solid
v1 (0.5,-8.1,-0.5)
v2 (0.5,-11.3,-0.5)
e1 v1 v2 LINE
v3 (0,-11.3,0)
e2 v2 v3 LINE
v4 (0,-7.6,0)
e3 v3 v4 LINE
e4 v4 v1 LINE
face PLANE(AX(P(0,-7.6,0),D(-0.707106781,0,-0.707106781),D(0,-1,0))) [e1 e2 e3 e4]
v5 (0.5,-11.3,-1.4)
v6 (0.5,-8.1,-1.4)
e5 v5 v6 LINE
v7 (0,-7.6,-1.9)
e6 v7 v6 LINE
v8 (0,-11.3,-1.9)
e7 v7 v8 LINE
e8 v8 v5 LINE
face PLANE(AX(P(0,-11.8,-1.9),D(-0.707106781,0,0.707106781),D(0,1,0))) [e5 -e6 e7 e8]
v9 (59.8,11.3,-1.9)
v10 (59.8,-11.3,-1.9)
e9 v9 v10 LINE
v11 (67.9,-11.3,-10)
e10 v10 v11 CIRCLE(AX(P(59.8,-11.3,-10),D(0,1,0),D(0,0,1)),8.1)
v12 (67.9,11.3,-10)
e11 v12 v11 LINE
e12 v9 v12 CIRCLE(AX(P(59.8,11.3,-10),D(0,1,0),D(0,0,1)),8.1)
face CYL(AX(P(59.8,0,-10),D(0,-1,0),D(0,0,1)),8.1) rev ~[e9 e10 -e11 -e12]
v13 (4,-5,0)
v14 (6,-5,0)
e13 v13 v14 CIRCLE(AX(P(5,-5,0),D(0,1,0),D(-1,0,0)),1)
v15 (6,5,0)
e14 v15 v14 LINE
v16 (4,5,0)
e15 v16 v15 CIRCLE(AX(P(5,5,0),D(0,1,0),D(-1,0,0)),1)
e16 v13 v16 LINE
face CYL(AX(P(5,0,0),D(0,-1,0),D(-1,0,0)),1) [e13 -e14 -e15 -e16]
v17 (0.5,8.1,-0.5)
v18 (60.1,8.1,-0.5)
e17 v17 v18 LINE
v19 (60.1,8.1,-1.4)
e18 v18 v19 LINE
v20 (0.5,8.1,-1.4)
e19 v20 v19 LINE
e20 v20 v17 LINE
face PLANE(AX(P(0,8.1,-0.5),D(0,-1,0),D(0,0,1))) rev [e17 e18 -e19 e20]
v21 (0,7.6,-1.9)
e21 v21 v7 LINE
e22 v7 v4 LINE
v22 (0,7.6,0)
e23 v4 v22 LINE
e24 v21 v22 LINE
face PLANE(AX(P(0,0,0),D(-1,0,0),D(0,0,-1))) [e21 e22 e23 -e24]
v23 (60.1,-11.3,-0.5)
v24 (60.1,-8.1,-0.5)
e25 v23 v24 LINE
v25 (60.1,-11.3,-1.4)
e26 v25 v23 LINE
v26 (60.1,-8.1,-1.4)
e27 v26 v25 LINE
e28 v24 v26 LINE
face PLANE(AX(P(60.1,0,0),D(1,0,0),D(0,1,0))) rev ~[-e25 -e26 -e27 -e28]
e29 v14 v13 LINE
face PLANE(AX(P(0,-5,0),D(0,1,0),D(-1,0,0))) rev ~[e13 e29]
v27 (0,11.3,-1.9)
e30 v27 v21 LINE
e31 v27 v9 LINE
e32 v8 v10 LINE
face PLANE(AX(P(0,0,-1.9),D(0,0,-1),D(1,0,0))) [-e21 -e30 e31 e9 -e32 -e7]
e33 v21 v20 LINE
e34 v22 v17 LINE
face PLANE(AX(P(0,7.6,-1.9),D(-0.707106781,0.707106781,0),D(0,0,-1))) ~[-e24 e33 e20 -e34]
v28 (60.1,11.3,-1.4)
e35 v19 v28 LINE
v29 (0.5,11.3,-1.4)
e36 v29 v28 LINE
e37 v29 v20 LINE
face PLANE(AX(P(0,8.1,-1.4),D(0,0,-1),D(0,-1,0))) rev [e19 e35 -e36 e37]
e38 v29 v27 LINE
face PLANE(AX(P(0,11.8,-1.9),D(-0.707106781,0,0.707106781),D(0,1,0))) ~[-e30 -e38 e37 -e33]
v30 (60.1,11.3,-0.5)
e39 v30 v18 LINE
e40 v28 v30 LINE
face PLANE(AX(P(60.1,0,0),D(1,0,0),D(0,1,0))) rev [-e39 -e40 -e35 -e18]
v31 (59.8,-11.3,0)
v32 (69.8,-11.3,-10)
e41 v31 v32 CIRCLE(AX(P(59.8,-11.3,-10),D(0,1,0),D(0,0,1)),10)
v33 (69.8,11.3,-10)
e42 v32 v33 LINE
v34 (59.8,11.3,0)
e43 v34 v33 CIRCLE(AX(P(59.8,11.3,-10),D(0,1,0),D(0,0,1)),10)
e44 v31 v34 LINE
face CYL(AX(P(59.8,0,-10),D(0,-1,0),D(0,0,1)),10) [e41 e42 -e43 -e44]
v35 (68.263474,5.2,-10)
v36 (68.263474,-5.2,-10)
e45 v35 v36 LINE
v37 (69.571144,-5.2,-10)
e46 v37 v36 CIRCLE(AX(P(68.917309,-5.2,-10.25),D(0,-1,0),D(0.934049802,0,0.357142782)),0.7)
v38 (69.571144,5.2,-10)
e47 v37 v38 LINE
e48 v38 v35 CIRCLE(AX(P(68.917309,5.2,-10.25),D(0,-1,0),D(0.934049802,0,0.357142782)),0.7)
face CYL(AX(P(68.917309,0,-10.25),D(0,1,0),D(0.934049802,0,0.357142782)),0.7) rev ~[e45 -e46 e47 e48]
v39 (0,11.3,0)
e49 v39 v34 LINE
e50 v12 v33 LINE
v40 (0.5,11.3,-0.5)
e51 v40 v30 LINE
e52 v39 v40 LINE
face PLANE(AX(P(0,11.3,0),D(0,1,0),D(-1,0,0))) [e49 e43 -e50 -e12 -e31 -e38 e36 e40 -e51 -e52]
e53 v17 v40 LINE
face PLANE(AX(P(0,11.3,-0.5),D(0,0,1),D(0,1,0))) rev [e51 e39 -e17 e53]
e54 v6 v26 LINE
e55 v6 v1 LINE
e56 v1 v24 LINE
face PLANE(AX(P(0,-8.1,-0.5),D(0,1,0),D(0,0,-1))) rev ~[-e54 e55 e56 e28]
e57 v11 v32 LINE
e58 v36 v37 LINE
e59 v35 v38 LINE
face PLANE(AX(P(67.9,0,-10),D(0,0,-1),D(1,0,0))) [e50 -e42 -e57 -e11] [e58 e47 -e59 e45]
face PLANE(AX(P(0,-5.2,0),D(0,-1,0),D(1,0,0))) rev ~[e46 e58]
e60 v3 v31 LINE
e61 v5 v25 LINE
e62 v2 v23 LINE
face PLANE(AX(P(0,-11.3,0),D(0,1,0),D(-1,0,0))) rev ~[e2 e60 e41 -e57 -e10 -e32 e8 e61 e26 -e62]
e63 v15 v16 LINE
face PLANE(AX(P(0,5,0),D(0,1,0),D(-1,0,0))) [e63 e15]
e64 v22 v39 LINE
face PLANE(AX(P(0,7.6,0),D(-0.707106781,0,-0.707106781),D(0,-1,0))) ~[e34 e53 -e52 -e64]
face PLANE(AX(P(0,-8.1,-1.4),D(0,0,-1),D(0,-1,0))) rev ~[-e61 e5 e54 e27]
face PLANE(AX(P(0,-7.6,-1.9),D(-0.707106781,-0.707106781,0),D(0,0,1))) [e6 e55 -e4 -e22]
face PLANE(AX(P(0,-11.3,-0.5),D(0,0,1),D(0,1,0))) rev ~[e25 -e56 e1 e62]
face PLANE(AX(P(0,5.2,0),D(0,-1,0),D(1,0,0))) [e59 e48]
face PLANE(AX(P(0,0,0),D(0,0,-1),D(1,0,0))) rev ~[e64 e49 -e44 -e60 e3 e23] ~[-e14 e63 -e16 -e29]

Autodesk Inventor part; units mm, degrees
ref_plane "YZ Plane" through (0, 0, 0) normal (1, 0, 0) x (0, 1, 0)
ref_plane "XZ Plane" through (0, 0, 0) normal (0, 1, 0) x (-1, 0, 0)
sketch "Sketch1" plane through (0, 0, 0) normal (0, 1, 0) x (-1, 0, 0)
  line L0 (0, 0) -> (-59.8, 0)
  arc A0 (-59.8, 0) -> (-69.8, -10) centre (-59.8, -10) ccw
  line L1 (0, -1.9) -> (-59.8, -1.9)
  arc A1 (-59.8, -1.9) -> (-67.9, -10) centre (-59.8, -10) ccw
  line L2 (0, 0) -> (0, -1.9)
  line L3 (-67.9, -10) -> (-69.8, -10)
  dimension "d4" = 10
  dimension "d5" = 69.8
  dimension "d6" = 1.9
extrude "Extrusion1" add sketch "Sketch1" along normal mid plane 22.6
sketch "Sketch3" plane through (0, 0, 0) normal (1, 0, 0) x (0, 1, 0)
  line L0 (-11.3, -0.5) -> (-8.1, -0.5)
  line L1 (-8.1, -0.5) -> (-8.1, -1.4)
  line L2 (-8.1, -1.4) -> (-11.3, -1.4)
  line L3 (-11.3, -1.4) -> (-11.3, -0.5)
  line L4 (-11.3, 0) -> (-11.3, -1.9) construction
  line L5 (-11.8, -1.9) -> (-7.6, -1.9)
  line L6 (-7.6, -1.9) -> (-7.6, 0)
  line L7 (-7.6, 0) -> (-11.8, 0)
  line L8 (-11.8, 0) -> (-11.8, -1.9)
  point P0 (0, 0)
  point P1 (-11.3, -0.95)
  dimension "d11" = 3.2
  dimension "d12" = 0.9
  dimension "d18" = 0.5
  dimension "d19" = 0.5
  dimension "d20" = 0.5
  dimension "d21" = 0.5
extrude "Extrusion2" cut sketch "Sketch3" along normal blind 60.1 contours L0 L1 L2 L3
sketch "Sketch3 outline for Extrusion3" plane through (0, 0, 0) normal (1, 0, 0) x (0, 1, 0)
  line L0 (-11.8, -1.9) -> (-7.6, -1.9)
  line L1 (-11.8, 0) -> (-11.8, -1.9)
  line L2 (-7.6, 0) -> (-11.8, 0)
  line L3 (-7.6, -1.9) -> (-7.6, 0)
extrude "Extrusion3" cut sketch "Sketch3 outline for Extrusion3" along normal blind 0.5 draft -45
mirror "Mirror1" about plane through (0, 0, 0) normal (0, 1, 0) of "Extrusion2", "Extrusion3"
ref_plane "Work Plane1" through (0, 0, 0) normal (0, -1, 0) x (1, 0, 0)
sketch "Sketch4" plane through (0, 0, 0) normal (0, -1, 0) x (1, 0, 0)
  line L0 (67.9, -10) -> (69.8, -10)
  arc A0 (69.571144, -10) -> (68.263474, -10) centre (68.917309, -10.25) ccw
  point P0 (0, 0)
  dimension "d26" = 0.7
  dimension "d27" = 0.25
extrude "Extrusion4" cut sketch "Sketch4" along normal mid plane 10.4
sketch "Sketch5" plane through (0, 0, 0) normal (0, 1, 0) x (-1, 0, 0)
  arc A0 (-4, 0) -> (-6, 0) centre (-5, 0) ccw
  line L0 (-6, 0) -> (-4, 0)
  line L1 (-59.8, 0) -> (0, 0) construction
  dimension "d30" = 1
  dimension "d31" = 5
extrude "Extrusion5" add sketch "Sketch5" along normal mid plane 10
equation "\"d4\" = fillet_outer_radius"
equation "\"d5\" = -fillet_outer_radius + total_width - 2 * tol"
equation "\"d6\" = thickness - tol"
equation "\"d7\" = door_height - 4 * tol"
equation "\"d11\" = door_rail_height + 2 * tol"
equation "\"d12\" = door_rail_depth + 4 * tol"
equation "\"d18\" = door_rail_depth"
equation "\"d19\" = door_rail_depth"
equation "\"d20\" = door_rail_depth"
equation "\"d21\" = door_rail_depth"
equation "\"d13\" = -2 * fillet_outer_radius + total_width + tol"
equation "\"d22\" = door_rail_depth"
equation "\"d26\" = door_strike_radius + 2 * tol"
equation "\"d28\" = door_strike_height + 4 * tol"
equation "\"d30\" = door_handle_radius"
equation "\"d31\" = door_handle_inset_width"
equation "\"d32\" = door_handle_height"
equation "\"door_handle_inset_width\" = 5"
equation "\"door_handle_height\" = 10"
equation "\"door_handle_radius\" = 1"
equation "\"fillet_outer_radius\" = 10"
equation "\"total_width\" = 80"
equation "\"tol\" = 0.1"
equation "\"thickness\" = 2"
equation "\"door_height\" = 23"
equation "\"door_rail_height\" = 3"
equation "\"door_rail_depth\" = 0.5"
equation "\"door_strike_radius\" = 0.5"
equation "\"door_strike_height\" = 10"
properties part number "DOOR" material "PC/ABS Plastic"
